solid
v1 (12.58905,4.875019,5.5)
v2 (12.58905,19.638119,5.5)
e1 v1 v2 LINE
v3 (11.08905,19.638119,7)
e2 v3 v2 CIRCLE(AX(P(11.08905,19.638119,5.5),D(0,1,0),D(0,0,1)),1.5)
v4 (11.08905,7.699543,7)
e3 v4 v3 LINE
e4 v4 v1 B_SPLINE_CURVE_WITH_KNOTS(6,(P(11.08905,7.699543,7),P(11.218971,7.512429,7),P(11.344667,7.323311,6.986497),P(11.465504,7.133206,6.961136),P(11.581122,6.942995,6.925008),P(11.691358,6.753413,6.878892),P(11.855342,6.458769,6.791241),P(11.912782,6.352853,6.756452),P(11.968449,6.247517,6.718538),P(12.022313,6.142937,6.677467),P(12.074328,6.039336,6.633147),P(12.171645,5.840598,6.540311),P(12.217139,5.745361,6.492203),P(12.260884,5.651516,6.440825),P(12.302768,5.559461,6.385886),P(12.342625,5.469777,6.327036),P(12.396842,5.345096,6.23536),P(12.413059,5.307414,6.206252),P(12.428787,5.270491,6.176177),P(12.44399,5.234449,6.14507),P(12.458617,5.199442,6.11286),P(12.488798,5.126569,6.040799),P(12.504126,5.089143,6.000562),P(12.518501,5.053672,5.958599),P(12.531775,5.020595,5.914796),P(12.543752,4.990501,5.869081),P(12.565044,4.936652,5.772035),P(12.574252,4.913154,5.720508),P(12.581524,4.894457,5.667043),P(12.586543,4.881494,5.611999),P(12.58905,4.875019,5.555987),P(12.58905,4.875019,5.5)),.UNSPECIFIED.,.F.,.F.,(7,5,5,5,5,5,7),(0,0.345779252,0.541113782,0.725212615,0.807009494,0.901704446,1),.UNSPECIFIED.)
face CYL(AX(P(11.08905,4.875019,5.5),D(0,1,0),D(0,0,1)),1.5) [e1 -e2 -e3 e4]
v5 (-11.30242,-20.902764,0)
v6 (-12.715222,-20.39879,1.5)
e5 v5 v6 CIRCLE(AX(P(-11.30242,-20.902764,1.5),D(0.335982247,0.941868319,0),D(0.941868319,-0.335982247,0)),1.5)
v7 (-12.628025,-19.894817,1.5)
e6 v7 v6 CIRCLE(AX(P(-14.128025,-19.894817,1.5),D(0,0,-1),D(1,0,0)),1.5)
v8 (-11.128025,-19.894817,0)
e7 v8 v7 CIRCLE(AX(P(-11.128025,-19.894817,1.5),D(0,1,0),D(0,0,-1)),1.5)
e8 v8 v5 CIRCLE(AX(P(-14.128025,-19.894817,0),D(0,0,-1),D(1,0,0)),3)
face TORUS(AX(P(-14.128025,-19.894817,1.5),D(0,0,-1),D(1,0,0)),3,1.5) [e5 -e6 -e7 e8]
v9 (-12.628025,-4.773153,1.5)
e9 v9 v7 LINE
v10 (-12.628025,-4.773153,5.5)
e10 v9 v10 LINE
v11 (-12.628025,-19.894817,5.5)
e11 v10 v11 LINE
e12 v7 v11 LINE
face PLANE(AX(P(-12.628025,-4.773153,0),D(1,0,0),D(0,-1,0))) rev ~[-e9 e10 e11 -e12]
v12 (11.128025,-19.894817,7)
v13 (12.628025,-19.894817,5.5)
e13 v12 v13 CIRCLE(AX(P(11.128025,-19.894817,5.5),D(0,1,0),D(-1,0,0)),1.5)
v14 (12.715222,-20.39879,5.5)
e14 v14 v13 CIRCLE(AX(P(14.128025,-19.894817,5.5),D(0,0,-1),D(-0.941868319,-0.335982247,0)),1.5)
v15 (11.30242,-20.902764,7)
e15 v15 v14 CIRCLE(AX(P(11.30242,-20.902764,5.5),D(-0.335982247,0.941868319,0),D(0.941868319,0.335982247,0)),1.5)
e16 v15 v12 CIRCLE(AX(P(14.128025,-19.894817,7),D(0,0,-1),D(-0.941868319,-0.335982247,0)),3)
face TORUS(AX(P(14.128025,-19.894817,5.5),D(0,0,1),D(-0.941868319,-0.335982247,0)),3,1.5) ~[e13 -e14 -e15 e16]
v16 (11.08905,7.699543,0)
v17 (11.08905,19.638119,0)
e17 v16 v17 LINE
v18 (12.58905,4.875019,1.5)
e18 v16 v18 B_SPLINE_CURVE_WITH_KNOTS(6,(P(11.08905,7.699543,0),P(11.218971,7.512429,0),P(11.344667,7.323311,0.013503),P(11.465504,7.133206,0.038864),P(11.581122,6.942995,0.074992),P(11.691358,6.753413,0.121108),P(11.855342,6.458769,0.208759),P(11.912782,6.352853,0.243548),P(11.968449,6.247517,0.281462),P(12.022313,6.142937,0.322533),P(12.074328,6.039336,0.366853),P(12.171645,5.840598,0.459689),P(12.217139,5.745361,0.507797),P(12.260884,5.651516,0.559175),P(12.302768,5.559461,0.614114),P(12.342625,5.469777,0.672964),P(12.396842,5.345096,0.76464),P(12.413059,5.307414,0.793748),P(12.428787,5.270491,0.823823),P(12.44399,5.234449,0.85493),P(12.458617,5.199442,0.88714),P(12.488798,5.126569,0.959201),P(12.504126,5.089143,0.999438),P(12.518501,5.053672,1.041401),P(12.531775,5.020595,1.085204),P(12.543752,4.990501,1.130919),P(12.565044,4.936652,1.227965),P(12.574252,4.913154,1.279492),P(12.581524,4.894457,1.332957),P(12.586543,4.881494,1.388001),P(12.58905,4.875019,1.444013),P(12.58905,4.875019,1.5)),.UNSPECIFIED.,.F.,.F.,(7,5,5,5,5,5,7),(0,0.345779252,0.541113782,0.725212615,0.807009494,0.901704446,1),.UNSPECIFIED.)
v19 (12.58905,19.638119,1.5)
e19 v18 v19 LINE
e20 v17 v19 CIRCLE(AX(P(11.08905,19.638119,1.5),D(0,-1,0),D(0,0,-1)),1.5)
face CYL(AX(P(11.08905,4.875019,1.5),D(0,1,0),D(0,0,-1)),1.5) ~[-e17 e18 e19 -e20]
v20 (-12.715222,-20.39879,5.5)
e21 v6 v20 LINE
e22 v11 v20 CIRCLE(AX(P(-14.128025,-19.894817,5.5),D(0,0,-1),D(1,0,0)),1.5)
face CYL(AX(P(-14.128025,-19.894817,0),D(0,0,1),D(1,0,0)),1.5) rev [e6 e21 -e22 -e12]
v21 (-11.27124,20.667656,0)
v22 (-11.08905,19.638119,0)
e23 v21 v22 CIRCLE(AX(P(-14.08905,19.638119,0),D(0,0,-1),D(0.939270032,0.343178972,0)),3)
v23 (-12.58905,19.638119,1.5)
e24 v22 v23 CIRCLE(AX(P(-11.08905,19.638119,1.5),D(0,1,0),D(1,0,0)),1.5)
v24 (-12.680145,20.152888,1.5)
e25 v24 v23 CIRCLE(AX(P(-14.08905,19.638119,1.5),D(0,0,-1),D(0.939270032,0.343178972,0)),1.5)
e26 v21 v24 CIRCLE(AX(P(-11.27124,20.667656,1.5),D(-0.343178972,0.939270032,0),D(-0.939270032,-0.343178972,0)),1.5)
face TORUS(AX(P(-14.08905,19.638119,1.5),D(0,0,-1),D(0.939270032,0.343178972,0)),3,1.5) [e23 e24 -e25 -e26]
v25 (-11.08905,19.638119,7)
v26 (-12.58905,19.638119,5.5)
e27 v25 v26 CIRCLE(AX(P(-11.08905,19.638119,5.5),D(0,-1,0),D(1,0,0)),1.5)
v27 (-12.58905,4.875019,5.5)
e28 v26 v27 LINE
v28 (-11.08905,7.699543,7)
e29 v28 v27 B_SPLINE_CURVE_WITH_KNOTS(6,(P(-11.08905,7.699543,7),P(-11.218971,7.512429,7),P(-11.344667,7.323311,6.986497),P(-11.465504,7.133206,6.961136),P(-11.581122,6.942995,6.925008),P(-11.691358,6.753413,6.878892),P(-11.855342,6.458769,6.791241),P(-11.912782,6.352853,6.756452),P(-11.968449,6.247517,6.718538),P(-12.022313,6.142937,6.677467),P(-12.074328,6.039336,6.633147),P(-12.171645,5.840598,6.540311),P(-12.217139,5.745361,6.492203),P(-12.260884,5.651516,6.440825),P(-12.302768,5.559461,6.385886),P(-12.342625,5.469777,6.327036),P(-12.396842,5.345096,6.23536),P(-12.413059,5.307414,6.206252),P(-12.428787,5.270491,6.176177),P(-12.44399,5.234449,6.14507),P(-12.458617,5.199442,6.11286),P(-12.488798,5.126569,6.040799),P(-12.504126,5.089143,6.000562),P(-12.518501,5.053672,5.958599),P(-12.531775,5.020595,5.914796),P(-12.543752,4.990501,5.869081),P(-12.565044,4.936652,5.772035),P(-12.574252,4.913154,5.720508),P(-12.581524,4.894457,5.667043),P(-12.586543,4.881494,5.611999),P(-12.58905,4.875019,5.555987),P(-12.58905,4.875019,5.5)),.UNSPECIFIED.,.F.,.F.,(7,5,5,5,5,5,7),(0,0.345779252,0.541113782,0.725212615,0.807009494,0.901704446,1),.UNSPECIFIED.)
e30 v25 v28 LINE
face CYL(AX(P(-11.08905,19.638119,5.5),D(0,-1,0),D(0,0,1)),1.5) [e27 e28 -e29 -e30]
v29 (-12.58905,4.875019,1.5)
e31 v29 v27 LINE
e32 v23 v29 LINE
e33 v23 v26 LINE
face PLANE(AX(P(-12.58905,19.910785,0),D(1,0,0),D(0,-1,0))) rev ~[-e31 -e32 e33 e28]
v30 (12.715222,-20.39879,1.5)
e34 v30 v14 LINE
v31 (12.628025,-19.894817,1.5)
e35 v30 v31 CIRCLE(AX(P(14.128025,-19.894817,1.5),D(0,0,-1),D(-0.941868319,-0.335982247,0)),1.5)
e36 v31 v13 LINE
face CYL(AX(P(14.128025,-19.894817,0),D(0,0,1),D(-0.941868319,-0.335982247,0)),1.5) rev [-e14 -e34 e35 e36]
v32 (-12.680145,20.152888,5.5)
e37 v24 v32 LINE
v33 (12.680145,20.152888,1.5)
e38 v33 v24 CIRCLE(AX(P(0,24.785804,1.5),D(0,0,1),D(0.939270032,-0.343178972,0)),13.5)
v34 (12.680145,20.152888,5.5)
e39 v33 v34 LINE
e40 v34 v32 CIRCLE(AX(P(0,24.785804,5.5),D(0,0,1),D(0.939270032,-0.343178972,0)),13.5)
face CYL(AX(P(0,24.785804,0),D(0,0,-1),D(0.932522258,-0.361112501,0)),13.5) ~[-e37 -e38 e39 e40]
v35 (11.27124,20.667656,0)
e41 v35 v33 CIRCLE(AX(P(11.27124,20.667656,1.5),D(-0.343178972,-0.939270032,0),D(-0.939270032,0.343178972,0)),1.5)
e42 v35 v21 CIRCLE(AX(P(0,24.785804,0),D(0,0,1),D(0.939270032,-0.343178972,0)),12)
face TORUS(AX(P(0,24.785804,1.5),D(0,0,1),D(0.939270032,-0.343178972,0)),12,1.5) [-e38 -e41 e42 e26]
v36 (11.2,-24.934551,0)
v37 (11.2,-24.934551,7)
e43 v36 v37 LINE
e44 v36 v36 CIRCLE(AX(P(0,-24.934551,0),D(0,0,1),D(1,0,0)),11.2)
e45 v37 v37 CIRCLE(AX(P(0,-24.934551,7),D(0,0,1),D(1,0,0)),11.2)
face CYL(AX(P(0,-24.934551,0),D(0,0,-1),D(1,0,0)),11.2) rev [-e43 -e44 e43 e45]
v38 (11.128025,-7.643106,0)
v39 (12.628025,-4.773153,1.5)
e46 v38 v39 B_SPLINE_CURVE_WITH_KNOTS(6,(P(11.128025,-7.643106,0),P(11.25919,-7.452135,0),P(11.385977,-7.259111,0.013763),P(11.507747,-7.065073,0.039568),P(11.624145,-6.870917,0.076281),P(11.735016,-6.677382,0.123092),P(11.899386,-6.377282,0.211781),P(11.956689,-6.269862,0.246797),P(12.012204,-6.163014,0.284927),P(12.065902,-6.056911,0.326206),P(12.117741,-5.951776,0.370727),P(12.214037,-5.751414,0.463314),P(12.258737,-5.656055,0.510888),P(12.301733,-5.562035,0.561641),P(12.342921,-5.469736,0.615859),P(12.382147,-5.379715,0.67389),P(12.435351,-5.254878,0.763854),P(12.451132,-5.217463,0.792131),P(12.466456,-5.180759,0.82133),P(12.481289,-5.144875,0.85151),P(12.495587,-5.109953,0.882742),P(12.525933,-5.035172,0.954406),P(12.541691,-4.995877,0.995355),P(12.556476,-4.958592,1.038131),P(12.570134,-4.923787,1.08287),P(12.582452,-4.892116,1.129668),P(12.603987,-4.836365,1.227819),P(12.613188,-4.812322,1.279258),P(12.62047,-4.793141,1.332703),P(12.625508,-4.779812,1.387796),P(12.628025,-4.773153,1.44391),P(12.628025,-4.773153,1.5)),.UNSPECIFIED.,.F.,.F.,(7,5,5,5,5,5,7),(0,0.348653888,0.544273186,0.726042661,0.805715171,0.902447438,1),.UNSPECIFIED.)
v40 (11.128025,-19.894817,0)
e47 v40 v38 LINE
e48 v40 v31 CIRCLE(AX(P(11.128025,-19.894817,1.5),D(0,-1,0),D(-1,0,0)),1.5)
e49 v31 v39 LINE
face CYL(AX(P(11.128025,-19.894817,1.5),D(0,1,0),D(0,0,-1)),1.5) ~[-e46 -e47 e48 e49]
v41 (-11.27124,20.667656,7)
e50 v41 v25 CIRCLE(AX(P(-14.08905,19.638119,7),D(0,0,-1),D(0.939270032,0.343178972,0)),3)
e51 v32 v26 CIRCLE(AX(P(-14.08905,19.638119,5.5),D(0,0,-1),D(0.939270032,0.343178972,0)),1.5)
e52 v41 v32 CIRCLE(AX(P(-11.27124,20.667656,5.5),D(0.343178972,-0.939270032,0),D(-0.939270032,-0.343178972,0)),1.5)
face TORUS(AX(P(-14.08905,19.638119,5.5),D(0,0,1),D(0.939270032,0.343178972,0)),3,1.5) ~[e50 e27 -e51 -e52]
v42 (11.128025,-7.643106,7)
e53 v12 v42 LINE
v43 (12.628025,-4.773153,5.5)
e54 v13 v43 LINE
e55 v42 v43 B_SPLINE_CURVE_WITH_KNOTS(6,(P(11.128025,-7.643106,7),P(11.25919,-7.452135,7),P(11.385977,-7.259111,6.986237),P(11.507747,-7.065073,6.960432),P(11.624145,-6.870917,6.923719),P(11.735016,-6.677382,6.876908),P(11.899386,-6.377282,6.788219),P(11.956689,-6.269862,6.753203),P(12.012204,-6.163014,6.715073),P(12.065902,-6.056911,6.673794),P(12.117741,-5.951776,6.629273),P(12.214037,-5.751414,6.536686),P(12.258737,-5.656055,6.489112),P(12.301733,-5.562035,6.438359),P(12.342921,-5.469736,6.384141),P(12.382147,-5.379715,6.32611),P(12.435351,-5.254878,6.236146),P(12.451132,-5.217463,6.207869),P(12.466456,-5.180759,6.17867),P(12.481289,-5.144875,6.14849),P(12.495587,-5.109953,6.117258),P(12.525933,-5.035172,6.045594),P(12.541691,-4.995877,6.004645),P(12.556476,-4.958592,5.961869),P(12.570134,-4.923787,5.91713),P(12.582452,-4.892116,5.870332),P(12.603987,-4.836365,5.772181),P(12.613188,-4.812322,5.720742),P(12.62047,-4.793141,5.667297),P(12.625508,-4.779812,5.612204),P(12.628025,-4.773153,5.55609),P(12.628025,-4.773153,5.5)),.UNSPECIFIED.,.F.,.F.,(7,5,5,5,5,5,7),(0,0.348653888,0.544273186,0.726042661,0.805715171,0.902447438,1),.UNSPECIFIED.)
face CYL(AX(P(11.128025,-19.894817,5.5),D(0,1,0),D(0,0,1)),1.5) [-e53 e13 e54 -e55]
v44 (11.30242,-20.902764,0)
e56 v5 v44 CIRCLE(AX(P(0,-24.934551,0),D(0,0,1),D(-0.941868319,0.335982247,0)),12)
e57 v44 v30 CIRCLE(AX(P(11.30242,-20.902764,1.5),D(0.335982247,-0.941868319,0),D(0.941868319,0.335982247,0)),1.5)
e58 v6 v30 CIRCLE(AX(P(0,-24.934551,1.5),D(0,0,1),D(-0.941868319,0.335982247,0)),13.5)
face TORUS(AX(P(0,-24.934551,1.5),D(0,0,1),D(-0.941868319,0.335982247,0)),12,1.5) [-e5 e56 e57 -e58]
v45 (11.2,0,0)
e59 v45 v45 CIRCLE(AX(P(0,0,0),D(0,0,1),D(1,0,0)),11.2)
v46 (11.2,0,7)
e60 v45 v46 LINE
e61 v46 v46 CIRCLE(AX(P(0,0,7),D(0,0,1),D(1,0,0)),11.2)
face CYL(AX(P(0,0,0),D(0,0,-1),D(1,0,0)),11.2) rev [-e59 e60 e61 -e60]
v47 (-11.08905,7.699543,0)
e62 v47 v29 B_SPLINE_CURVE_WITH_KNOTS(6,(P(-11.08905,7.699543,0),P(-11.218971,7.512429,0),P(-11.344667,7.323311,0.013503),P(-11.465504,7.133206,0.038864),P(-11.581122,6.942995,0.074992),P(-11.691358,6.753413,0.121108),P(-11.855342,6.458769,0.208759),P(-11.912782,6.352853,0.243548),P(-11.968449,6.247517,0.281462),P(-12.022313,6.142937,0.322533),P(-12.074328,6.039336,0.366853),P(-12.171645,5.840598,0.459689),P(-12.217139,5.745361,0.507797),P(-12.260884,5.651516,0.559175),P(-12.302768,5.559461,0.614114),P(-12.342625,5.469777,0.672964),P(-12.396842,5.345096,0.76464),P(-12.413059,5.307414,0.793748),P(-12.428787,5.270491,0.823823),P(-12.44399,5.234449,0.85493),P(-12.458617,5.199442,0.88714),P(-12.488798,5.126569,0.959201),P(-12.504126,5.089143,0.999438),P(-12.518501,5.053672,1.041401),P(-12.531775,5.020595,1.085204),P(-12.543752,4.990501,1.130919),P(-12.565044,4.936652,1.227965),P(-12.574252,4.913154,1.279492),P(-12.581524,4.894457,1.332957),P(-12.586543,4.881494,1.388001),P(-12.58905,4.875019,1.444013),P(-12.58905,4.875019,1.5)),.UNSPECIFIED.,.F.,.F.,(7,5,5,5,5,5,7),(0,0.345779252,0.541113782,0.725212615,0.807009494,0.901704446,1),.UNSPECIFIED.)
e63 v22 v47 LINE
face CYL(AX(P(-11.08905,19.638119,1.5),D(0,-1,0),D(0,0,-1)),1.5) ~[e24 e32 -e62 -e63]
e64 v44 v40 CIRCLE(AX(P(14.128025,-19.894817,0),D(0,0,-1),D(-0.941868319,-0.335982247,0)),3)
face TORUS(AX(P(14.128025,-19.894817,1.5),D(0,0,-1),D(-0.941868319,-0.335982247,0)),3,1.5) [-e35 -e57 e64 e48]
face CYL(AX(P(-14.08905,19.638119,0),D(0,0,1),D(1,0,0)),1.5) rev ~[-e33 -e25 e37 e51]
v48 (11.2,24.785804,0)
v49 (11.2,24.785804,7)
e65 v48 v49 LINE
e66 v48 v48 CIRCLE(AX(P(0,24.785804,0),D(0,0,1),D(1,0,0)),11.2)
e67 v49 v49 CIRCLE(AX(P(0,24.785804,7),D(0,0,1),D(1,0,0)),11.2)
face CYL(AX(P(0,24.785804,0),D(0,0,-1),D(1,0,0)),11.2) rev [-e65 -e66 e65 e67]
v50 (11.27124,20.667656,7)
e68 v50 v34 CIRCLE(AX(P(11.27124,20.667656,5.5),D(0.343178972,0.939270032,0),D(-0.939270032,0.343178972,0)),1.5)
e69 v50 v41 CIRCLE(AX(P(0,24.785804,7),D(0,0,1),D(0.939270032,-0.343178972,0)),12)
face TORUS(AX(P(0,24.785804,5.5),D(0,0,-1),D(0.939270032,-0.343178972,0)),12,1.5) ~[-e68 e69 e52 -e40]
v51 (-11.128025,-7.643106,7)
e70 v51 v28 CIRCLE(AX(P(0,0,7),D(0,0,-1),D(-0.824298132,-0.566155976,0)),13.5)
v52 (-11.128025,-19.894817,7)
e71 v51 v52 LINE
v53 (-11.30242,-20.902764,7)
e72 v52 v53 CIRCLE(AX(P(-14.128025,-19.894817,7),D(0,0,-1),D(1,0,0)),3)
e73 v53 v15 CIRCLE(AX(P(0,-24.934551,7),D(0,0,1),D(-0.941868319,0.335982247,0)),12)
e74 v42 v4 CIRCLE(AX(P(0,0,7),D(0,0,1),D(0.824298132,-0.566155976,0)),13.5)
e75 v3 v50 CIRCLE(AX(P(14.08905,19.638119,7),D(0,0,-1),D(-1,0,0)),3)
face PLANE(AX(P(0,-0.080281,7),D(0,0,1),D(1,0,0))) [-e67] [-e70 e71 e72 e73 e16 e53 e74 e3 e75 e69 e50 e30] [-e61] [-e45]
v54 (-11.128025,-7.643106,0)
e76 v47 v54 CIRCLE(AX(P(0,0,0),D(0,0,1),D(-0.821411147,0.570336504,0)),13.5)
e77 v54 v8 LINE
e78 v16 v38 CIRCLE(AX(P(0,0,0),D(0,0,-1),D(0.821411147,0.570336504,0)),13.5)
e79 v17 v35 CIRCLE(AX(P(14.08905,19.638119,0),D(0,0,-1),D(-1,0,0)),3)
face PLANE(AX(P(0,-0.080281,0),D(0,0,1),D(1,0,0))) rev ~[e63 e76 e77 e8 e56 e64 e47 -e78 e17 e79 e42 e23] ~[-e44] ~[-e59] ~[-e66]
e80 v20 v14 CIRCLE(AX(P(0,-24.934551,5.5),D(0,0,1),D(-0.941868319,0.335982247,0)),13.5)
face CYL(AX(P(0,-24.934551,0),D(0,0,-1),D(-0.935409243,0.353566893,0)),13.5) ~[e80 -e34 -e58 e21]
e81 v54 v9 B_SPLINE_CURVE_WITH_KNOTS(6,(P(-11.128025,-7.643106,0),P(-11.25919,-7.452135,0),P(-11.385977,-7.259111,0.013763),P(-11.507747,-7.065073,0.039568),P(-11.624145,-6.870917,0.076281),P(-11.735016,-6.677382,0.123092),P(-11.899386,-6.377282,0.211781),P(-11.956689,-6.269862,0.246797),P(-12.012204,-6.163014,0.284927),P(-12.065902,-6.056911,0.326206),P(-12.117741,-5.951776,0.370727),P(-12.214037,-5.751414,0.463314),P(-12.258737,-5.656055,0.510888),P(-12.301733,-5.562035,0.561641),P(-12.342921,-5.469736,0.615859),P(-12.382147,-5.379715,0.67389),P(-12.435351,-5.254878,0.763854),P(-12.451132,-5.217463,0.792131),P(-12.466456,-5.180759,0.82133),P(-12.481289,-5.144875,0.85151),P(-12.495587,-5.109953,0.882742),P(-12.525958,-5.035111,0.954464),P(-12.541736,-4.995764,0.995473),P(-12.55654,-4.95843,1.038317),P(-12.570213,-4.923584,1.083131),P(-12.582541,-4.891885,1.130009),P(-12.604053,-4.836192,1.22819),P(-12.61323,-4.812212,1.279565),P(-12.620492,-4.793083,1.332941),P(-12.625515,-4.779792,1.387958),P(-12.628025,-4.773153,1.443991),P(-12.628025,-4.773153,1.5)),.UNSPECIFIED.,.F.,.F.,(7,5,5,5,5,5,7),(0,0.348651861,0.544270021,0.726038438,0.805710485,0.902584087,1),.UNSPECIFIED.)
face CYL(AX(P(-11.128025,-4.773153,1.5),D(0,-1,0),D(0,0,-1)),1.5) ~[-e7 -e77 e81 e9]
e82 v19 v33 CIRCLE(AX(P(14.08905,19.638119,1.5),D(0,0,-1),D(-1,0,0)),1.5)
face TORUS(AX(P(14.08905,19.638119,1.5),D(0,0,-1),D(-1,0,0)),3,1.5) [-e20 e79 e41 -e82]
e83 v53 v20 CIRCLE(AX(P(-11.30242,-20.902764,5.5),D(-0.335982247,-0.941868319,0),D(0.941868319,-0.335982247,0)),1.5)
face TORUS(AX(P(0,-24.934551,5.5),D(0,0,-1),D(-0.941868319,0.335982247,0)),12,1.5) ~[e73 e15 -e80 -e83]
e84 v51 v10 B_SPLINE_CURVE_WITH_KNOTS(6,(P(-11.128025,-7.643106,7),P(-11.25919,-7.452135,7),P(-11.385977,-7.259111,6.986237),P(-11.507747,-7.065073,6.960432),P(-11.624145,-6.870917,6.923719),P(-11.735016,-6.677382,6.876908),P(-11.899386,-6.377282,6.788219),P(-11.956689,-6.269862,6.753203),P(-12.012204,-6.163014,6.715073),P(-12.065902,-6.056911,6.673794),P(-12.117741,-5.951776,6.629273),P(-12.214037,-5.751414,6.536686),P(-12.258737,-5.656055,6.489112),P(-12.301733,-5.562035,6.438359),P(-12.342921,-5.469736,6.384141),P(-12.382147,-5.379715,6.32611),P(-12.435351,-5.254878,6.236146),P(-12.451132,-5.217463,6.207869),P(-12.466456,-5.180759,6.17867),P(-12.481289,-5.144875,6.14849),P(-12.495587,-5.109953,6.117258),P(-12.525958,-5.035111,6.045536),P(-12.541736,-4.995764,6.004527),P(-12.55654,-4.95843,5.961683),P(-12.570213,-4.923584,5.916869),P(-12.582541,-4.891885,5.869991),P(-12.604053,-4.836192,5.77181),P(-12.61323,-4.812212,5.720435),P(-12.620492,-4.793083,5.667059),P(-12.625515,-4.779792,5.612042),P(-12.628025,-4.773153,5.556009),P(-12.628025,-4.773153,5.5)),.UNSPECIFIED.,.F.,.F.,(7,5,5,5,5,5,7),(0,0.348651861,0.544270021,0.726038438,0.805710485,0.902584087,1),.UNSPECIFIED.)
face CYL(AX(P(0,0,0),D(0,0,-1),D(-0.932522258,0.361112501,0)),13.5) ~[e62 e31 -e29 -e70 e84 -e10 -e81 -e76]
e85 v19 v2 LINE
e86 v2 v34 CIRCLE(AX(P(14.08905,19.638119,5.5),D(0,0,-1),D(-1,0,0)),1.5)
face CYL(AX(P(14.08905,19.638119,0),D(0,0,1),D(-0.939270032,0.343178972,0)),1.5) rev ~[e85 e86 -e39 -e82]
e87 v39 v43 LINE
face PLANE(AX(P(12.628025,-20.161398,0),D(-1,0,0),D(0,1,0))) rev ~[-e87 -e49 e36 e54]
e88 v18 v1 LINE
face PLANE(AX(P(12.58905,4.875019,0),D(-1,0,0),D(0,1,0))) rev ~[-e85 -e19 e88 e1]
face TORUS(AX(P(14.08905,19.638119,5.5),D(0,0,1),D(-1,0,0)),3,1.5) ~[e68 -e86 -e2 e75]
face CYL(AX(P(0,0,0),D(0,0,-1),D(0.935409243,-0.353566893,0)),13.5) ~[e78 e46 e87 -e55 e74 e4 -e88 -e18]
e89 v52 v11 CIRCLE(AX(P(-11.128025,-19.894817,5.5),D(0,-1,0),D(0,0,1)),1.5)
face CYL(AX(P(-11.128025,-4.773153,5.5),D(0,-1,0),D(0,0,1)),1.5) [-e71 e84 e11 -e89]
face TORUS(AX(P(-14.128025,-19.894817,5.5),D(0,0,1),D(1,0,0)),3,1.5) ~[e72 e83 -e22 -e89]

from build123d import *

# Parameters (mm, degrees)
F0_R     = 11.2
F1_DEPTH = 7
F2_F1_R  = 1.5
F2_F2_R  = 1.5


with BuildPart() as f1:
    # F0 (on Top) → F1 (new body)
    with BuildSketch(Plane.XY):
        with BuildLine():
            Line((-12.5890504837, 19.9107848701), (-12.5890504837, 4.8750187608))
            ThreePointArc((-12.5890504837, 4.8750187608), (-13.4998898549, 0.0545335167), (-12.6280247824, -4.773153056))
            Line((-12.6280247824, -4.773153056), (-12.6280247824, -20.1613976912))
            ThreePointArc((-12.6280247824, -20.1613976912), (0, -38.4345507473), (12.6280247824, -20.1613976912))
            Line((12.6280247824, -20.1613976912), (12.6280247824, -4.773153056))
            ThreePointArc((12.6280247824, -4.773153056), (13.4998898549, 0.0545335167), (12.5890504837, 4.8750187608))
            Line((12.5890504837, 4.8750187608), (12.5890504837, 19.9107848701))
            ThreePointArc((12.5890504837, 19.9107848701), (0, 38.2858036309), (-12.5890504837, 19.9107848701))
        make_face()
        with Locations((0, -24.9345507473)):
            Circle(F0_R, mode=Mode.SUBTRACT)
        Circle(F0_R, mode=Mode.SUBTRACT)
        with Locations((0, 24.7858036309)):
            Circle(F0_R, mode=Mode.SUBTRACT)
    extrude(amount=F1_DEPTH)

    # F2: fillet of radius 1.5 on 8 edges, made by hand

    # F2_f1
    f2_f1_edges = [f1.edges().sort_by_distance(p)[0] for p in [
        (12.5890504837, 19.9107848701, 3.5),
        (-12.5890504837, 19.9107848701, 3.5),
        (-12.6280247824, -20.1613976912, 3.5),
        (12.6280247824, -20.1613976912, 3.5),
    ]]
    fillet(f2_f1_edges, radius=F2_F1_R)

    # F2_f2
    f2_f2_edges = [f1.edges().sort_by_distance(p)[0] for p in [
        (0, 38.2858036309, 0),
        (0, 38.2858036309, 7),
        (0, -38.4345507473, 0),
        (0, -38.4345507473, 7),
        (-12.6499849119, -20.1505476521, 7),
        (12.6499849119, -20.1505476521, 7),
        (-12.6499849119, -20.1505476521, 0),
        (12.6499849119, -20.1505476521, 0),
        (12.6119997783, 19.8995023273, 7),
        (-12.6119997783, 19.8995023273, 7),
        (12.6119997783, 19.8995023273, 0),
        (-12.6119997783, 19.8995023273, 0),
    ]]
    fillet(f2_f2_edges, radius=F2_F2_R)


solid = f1.part
